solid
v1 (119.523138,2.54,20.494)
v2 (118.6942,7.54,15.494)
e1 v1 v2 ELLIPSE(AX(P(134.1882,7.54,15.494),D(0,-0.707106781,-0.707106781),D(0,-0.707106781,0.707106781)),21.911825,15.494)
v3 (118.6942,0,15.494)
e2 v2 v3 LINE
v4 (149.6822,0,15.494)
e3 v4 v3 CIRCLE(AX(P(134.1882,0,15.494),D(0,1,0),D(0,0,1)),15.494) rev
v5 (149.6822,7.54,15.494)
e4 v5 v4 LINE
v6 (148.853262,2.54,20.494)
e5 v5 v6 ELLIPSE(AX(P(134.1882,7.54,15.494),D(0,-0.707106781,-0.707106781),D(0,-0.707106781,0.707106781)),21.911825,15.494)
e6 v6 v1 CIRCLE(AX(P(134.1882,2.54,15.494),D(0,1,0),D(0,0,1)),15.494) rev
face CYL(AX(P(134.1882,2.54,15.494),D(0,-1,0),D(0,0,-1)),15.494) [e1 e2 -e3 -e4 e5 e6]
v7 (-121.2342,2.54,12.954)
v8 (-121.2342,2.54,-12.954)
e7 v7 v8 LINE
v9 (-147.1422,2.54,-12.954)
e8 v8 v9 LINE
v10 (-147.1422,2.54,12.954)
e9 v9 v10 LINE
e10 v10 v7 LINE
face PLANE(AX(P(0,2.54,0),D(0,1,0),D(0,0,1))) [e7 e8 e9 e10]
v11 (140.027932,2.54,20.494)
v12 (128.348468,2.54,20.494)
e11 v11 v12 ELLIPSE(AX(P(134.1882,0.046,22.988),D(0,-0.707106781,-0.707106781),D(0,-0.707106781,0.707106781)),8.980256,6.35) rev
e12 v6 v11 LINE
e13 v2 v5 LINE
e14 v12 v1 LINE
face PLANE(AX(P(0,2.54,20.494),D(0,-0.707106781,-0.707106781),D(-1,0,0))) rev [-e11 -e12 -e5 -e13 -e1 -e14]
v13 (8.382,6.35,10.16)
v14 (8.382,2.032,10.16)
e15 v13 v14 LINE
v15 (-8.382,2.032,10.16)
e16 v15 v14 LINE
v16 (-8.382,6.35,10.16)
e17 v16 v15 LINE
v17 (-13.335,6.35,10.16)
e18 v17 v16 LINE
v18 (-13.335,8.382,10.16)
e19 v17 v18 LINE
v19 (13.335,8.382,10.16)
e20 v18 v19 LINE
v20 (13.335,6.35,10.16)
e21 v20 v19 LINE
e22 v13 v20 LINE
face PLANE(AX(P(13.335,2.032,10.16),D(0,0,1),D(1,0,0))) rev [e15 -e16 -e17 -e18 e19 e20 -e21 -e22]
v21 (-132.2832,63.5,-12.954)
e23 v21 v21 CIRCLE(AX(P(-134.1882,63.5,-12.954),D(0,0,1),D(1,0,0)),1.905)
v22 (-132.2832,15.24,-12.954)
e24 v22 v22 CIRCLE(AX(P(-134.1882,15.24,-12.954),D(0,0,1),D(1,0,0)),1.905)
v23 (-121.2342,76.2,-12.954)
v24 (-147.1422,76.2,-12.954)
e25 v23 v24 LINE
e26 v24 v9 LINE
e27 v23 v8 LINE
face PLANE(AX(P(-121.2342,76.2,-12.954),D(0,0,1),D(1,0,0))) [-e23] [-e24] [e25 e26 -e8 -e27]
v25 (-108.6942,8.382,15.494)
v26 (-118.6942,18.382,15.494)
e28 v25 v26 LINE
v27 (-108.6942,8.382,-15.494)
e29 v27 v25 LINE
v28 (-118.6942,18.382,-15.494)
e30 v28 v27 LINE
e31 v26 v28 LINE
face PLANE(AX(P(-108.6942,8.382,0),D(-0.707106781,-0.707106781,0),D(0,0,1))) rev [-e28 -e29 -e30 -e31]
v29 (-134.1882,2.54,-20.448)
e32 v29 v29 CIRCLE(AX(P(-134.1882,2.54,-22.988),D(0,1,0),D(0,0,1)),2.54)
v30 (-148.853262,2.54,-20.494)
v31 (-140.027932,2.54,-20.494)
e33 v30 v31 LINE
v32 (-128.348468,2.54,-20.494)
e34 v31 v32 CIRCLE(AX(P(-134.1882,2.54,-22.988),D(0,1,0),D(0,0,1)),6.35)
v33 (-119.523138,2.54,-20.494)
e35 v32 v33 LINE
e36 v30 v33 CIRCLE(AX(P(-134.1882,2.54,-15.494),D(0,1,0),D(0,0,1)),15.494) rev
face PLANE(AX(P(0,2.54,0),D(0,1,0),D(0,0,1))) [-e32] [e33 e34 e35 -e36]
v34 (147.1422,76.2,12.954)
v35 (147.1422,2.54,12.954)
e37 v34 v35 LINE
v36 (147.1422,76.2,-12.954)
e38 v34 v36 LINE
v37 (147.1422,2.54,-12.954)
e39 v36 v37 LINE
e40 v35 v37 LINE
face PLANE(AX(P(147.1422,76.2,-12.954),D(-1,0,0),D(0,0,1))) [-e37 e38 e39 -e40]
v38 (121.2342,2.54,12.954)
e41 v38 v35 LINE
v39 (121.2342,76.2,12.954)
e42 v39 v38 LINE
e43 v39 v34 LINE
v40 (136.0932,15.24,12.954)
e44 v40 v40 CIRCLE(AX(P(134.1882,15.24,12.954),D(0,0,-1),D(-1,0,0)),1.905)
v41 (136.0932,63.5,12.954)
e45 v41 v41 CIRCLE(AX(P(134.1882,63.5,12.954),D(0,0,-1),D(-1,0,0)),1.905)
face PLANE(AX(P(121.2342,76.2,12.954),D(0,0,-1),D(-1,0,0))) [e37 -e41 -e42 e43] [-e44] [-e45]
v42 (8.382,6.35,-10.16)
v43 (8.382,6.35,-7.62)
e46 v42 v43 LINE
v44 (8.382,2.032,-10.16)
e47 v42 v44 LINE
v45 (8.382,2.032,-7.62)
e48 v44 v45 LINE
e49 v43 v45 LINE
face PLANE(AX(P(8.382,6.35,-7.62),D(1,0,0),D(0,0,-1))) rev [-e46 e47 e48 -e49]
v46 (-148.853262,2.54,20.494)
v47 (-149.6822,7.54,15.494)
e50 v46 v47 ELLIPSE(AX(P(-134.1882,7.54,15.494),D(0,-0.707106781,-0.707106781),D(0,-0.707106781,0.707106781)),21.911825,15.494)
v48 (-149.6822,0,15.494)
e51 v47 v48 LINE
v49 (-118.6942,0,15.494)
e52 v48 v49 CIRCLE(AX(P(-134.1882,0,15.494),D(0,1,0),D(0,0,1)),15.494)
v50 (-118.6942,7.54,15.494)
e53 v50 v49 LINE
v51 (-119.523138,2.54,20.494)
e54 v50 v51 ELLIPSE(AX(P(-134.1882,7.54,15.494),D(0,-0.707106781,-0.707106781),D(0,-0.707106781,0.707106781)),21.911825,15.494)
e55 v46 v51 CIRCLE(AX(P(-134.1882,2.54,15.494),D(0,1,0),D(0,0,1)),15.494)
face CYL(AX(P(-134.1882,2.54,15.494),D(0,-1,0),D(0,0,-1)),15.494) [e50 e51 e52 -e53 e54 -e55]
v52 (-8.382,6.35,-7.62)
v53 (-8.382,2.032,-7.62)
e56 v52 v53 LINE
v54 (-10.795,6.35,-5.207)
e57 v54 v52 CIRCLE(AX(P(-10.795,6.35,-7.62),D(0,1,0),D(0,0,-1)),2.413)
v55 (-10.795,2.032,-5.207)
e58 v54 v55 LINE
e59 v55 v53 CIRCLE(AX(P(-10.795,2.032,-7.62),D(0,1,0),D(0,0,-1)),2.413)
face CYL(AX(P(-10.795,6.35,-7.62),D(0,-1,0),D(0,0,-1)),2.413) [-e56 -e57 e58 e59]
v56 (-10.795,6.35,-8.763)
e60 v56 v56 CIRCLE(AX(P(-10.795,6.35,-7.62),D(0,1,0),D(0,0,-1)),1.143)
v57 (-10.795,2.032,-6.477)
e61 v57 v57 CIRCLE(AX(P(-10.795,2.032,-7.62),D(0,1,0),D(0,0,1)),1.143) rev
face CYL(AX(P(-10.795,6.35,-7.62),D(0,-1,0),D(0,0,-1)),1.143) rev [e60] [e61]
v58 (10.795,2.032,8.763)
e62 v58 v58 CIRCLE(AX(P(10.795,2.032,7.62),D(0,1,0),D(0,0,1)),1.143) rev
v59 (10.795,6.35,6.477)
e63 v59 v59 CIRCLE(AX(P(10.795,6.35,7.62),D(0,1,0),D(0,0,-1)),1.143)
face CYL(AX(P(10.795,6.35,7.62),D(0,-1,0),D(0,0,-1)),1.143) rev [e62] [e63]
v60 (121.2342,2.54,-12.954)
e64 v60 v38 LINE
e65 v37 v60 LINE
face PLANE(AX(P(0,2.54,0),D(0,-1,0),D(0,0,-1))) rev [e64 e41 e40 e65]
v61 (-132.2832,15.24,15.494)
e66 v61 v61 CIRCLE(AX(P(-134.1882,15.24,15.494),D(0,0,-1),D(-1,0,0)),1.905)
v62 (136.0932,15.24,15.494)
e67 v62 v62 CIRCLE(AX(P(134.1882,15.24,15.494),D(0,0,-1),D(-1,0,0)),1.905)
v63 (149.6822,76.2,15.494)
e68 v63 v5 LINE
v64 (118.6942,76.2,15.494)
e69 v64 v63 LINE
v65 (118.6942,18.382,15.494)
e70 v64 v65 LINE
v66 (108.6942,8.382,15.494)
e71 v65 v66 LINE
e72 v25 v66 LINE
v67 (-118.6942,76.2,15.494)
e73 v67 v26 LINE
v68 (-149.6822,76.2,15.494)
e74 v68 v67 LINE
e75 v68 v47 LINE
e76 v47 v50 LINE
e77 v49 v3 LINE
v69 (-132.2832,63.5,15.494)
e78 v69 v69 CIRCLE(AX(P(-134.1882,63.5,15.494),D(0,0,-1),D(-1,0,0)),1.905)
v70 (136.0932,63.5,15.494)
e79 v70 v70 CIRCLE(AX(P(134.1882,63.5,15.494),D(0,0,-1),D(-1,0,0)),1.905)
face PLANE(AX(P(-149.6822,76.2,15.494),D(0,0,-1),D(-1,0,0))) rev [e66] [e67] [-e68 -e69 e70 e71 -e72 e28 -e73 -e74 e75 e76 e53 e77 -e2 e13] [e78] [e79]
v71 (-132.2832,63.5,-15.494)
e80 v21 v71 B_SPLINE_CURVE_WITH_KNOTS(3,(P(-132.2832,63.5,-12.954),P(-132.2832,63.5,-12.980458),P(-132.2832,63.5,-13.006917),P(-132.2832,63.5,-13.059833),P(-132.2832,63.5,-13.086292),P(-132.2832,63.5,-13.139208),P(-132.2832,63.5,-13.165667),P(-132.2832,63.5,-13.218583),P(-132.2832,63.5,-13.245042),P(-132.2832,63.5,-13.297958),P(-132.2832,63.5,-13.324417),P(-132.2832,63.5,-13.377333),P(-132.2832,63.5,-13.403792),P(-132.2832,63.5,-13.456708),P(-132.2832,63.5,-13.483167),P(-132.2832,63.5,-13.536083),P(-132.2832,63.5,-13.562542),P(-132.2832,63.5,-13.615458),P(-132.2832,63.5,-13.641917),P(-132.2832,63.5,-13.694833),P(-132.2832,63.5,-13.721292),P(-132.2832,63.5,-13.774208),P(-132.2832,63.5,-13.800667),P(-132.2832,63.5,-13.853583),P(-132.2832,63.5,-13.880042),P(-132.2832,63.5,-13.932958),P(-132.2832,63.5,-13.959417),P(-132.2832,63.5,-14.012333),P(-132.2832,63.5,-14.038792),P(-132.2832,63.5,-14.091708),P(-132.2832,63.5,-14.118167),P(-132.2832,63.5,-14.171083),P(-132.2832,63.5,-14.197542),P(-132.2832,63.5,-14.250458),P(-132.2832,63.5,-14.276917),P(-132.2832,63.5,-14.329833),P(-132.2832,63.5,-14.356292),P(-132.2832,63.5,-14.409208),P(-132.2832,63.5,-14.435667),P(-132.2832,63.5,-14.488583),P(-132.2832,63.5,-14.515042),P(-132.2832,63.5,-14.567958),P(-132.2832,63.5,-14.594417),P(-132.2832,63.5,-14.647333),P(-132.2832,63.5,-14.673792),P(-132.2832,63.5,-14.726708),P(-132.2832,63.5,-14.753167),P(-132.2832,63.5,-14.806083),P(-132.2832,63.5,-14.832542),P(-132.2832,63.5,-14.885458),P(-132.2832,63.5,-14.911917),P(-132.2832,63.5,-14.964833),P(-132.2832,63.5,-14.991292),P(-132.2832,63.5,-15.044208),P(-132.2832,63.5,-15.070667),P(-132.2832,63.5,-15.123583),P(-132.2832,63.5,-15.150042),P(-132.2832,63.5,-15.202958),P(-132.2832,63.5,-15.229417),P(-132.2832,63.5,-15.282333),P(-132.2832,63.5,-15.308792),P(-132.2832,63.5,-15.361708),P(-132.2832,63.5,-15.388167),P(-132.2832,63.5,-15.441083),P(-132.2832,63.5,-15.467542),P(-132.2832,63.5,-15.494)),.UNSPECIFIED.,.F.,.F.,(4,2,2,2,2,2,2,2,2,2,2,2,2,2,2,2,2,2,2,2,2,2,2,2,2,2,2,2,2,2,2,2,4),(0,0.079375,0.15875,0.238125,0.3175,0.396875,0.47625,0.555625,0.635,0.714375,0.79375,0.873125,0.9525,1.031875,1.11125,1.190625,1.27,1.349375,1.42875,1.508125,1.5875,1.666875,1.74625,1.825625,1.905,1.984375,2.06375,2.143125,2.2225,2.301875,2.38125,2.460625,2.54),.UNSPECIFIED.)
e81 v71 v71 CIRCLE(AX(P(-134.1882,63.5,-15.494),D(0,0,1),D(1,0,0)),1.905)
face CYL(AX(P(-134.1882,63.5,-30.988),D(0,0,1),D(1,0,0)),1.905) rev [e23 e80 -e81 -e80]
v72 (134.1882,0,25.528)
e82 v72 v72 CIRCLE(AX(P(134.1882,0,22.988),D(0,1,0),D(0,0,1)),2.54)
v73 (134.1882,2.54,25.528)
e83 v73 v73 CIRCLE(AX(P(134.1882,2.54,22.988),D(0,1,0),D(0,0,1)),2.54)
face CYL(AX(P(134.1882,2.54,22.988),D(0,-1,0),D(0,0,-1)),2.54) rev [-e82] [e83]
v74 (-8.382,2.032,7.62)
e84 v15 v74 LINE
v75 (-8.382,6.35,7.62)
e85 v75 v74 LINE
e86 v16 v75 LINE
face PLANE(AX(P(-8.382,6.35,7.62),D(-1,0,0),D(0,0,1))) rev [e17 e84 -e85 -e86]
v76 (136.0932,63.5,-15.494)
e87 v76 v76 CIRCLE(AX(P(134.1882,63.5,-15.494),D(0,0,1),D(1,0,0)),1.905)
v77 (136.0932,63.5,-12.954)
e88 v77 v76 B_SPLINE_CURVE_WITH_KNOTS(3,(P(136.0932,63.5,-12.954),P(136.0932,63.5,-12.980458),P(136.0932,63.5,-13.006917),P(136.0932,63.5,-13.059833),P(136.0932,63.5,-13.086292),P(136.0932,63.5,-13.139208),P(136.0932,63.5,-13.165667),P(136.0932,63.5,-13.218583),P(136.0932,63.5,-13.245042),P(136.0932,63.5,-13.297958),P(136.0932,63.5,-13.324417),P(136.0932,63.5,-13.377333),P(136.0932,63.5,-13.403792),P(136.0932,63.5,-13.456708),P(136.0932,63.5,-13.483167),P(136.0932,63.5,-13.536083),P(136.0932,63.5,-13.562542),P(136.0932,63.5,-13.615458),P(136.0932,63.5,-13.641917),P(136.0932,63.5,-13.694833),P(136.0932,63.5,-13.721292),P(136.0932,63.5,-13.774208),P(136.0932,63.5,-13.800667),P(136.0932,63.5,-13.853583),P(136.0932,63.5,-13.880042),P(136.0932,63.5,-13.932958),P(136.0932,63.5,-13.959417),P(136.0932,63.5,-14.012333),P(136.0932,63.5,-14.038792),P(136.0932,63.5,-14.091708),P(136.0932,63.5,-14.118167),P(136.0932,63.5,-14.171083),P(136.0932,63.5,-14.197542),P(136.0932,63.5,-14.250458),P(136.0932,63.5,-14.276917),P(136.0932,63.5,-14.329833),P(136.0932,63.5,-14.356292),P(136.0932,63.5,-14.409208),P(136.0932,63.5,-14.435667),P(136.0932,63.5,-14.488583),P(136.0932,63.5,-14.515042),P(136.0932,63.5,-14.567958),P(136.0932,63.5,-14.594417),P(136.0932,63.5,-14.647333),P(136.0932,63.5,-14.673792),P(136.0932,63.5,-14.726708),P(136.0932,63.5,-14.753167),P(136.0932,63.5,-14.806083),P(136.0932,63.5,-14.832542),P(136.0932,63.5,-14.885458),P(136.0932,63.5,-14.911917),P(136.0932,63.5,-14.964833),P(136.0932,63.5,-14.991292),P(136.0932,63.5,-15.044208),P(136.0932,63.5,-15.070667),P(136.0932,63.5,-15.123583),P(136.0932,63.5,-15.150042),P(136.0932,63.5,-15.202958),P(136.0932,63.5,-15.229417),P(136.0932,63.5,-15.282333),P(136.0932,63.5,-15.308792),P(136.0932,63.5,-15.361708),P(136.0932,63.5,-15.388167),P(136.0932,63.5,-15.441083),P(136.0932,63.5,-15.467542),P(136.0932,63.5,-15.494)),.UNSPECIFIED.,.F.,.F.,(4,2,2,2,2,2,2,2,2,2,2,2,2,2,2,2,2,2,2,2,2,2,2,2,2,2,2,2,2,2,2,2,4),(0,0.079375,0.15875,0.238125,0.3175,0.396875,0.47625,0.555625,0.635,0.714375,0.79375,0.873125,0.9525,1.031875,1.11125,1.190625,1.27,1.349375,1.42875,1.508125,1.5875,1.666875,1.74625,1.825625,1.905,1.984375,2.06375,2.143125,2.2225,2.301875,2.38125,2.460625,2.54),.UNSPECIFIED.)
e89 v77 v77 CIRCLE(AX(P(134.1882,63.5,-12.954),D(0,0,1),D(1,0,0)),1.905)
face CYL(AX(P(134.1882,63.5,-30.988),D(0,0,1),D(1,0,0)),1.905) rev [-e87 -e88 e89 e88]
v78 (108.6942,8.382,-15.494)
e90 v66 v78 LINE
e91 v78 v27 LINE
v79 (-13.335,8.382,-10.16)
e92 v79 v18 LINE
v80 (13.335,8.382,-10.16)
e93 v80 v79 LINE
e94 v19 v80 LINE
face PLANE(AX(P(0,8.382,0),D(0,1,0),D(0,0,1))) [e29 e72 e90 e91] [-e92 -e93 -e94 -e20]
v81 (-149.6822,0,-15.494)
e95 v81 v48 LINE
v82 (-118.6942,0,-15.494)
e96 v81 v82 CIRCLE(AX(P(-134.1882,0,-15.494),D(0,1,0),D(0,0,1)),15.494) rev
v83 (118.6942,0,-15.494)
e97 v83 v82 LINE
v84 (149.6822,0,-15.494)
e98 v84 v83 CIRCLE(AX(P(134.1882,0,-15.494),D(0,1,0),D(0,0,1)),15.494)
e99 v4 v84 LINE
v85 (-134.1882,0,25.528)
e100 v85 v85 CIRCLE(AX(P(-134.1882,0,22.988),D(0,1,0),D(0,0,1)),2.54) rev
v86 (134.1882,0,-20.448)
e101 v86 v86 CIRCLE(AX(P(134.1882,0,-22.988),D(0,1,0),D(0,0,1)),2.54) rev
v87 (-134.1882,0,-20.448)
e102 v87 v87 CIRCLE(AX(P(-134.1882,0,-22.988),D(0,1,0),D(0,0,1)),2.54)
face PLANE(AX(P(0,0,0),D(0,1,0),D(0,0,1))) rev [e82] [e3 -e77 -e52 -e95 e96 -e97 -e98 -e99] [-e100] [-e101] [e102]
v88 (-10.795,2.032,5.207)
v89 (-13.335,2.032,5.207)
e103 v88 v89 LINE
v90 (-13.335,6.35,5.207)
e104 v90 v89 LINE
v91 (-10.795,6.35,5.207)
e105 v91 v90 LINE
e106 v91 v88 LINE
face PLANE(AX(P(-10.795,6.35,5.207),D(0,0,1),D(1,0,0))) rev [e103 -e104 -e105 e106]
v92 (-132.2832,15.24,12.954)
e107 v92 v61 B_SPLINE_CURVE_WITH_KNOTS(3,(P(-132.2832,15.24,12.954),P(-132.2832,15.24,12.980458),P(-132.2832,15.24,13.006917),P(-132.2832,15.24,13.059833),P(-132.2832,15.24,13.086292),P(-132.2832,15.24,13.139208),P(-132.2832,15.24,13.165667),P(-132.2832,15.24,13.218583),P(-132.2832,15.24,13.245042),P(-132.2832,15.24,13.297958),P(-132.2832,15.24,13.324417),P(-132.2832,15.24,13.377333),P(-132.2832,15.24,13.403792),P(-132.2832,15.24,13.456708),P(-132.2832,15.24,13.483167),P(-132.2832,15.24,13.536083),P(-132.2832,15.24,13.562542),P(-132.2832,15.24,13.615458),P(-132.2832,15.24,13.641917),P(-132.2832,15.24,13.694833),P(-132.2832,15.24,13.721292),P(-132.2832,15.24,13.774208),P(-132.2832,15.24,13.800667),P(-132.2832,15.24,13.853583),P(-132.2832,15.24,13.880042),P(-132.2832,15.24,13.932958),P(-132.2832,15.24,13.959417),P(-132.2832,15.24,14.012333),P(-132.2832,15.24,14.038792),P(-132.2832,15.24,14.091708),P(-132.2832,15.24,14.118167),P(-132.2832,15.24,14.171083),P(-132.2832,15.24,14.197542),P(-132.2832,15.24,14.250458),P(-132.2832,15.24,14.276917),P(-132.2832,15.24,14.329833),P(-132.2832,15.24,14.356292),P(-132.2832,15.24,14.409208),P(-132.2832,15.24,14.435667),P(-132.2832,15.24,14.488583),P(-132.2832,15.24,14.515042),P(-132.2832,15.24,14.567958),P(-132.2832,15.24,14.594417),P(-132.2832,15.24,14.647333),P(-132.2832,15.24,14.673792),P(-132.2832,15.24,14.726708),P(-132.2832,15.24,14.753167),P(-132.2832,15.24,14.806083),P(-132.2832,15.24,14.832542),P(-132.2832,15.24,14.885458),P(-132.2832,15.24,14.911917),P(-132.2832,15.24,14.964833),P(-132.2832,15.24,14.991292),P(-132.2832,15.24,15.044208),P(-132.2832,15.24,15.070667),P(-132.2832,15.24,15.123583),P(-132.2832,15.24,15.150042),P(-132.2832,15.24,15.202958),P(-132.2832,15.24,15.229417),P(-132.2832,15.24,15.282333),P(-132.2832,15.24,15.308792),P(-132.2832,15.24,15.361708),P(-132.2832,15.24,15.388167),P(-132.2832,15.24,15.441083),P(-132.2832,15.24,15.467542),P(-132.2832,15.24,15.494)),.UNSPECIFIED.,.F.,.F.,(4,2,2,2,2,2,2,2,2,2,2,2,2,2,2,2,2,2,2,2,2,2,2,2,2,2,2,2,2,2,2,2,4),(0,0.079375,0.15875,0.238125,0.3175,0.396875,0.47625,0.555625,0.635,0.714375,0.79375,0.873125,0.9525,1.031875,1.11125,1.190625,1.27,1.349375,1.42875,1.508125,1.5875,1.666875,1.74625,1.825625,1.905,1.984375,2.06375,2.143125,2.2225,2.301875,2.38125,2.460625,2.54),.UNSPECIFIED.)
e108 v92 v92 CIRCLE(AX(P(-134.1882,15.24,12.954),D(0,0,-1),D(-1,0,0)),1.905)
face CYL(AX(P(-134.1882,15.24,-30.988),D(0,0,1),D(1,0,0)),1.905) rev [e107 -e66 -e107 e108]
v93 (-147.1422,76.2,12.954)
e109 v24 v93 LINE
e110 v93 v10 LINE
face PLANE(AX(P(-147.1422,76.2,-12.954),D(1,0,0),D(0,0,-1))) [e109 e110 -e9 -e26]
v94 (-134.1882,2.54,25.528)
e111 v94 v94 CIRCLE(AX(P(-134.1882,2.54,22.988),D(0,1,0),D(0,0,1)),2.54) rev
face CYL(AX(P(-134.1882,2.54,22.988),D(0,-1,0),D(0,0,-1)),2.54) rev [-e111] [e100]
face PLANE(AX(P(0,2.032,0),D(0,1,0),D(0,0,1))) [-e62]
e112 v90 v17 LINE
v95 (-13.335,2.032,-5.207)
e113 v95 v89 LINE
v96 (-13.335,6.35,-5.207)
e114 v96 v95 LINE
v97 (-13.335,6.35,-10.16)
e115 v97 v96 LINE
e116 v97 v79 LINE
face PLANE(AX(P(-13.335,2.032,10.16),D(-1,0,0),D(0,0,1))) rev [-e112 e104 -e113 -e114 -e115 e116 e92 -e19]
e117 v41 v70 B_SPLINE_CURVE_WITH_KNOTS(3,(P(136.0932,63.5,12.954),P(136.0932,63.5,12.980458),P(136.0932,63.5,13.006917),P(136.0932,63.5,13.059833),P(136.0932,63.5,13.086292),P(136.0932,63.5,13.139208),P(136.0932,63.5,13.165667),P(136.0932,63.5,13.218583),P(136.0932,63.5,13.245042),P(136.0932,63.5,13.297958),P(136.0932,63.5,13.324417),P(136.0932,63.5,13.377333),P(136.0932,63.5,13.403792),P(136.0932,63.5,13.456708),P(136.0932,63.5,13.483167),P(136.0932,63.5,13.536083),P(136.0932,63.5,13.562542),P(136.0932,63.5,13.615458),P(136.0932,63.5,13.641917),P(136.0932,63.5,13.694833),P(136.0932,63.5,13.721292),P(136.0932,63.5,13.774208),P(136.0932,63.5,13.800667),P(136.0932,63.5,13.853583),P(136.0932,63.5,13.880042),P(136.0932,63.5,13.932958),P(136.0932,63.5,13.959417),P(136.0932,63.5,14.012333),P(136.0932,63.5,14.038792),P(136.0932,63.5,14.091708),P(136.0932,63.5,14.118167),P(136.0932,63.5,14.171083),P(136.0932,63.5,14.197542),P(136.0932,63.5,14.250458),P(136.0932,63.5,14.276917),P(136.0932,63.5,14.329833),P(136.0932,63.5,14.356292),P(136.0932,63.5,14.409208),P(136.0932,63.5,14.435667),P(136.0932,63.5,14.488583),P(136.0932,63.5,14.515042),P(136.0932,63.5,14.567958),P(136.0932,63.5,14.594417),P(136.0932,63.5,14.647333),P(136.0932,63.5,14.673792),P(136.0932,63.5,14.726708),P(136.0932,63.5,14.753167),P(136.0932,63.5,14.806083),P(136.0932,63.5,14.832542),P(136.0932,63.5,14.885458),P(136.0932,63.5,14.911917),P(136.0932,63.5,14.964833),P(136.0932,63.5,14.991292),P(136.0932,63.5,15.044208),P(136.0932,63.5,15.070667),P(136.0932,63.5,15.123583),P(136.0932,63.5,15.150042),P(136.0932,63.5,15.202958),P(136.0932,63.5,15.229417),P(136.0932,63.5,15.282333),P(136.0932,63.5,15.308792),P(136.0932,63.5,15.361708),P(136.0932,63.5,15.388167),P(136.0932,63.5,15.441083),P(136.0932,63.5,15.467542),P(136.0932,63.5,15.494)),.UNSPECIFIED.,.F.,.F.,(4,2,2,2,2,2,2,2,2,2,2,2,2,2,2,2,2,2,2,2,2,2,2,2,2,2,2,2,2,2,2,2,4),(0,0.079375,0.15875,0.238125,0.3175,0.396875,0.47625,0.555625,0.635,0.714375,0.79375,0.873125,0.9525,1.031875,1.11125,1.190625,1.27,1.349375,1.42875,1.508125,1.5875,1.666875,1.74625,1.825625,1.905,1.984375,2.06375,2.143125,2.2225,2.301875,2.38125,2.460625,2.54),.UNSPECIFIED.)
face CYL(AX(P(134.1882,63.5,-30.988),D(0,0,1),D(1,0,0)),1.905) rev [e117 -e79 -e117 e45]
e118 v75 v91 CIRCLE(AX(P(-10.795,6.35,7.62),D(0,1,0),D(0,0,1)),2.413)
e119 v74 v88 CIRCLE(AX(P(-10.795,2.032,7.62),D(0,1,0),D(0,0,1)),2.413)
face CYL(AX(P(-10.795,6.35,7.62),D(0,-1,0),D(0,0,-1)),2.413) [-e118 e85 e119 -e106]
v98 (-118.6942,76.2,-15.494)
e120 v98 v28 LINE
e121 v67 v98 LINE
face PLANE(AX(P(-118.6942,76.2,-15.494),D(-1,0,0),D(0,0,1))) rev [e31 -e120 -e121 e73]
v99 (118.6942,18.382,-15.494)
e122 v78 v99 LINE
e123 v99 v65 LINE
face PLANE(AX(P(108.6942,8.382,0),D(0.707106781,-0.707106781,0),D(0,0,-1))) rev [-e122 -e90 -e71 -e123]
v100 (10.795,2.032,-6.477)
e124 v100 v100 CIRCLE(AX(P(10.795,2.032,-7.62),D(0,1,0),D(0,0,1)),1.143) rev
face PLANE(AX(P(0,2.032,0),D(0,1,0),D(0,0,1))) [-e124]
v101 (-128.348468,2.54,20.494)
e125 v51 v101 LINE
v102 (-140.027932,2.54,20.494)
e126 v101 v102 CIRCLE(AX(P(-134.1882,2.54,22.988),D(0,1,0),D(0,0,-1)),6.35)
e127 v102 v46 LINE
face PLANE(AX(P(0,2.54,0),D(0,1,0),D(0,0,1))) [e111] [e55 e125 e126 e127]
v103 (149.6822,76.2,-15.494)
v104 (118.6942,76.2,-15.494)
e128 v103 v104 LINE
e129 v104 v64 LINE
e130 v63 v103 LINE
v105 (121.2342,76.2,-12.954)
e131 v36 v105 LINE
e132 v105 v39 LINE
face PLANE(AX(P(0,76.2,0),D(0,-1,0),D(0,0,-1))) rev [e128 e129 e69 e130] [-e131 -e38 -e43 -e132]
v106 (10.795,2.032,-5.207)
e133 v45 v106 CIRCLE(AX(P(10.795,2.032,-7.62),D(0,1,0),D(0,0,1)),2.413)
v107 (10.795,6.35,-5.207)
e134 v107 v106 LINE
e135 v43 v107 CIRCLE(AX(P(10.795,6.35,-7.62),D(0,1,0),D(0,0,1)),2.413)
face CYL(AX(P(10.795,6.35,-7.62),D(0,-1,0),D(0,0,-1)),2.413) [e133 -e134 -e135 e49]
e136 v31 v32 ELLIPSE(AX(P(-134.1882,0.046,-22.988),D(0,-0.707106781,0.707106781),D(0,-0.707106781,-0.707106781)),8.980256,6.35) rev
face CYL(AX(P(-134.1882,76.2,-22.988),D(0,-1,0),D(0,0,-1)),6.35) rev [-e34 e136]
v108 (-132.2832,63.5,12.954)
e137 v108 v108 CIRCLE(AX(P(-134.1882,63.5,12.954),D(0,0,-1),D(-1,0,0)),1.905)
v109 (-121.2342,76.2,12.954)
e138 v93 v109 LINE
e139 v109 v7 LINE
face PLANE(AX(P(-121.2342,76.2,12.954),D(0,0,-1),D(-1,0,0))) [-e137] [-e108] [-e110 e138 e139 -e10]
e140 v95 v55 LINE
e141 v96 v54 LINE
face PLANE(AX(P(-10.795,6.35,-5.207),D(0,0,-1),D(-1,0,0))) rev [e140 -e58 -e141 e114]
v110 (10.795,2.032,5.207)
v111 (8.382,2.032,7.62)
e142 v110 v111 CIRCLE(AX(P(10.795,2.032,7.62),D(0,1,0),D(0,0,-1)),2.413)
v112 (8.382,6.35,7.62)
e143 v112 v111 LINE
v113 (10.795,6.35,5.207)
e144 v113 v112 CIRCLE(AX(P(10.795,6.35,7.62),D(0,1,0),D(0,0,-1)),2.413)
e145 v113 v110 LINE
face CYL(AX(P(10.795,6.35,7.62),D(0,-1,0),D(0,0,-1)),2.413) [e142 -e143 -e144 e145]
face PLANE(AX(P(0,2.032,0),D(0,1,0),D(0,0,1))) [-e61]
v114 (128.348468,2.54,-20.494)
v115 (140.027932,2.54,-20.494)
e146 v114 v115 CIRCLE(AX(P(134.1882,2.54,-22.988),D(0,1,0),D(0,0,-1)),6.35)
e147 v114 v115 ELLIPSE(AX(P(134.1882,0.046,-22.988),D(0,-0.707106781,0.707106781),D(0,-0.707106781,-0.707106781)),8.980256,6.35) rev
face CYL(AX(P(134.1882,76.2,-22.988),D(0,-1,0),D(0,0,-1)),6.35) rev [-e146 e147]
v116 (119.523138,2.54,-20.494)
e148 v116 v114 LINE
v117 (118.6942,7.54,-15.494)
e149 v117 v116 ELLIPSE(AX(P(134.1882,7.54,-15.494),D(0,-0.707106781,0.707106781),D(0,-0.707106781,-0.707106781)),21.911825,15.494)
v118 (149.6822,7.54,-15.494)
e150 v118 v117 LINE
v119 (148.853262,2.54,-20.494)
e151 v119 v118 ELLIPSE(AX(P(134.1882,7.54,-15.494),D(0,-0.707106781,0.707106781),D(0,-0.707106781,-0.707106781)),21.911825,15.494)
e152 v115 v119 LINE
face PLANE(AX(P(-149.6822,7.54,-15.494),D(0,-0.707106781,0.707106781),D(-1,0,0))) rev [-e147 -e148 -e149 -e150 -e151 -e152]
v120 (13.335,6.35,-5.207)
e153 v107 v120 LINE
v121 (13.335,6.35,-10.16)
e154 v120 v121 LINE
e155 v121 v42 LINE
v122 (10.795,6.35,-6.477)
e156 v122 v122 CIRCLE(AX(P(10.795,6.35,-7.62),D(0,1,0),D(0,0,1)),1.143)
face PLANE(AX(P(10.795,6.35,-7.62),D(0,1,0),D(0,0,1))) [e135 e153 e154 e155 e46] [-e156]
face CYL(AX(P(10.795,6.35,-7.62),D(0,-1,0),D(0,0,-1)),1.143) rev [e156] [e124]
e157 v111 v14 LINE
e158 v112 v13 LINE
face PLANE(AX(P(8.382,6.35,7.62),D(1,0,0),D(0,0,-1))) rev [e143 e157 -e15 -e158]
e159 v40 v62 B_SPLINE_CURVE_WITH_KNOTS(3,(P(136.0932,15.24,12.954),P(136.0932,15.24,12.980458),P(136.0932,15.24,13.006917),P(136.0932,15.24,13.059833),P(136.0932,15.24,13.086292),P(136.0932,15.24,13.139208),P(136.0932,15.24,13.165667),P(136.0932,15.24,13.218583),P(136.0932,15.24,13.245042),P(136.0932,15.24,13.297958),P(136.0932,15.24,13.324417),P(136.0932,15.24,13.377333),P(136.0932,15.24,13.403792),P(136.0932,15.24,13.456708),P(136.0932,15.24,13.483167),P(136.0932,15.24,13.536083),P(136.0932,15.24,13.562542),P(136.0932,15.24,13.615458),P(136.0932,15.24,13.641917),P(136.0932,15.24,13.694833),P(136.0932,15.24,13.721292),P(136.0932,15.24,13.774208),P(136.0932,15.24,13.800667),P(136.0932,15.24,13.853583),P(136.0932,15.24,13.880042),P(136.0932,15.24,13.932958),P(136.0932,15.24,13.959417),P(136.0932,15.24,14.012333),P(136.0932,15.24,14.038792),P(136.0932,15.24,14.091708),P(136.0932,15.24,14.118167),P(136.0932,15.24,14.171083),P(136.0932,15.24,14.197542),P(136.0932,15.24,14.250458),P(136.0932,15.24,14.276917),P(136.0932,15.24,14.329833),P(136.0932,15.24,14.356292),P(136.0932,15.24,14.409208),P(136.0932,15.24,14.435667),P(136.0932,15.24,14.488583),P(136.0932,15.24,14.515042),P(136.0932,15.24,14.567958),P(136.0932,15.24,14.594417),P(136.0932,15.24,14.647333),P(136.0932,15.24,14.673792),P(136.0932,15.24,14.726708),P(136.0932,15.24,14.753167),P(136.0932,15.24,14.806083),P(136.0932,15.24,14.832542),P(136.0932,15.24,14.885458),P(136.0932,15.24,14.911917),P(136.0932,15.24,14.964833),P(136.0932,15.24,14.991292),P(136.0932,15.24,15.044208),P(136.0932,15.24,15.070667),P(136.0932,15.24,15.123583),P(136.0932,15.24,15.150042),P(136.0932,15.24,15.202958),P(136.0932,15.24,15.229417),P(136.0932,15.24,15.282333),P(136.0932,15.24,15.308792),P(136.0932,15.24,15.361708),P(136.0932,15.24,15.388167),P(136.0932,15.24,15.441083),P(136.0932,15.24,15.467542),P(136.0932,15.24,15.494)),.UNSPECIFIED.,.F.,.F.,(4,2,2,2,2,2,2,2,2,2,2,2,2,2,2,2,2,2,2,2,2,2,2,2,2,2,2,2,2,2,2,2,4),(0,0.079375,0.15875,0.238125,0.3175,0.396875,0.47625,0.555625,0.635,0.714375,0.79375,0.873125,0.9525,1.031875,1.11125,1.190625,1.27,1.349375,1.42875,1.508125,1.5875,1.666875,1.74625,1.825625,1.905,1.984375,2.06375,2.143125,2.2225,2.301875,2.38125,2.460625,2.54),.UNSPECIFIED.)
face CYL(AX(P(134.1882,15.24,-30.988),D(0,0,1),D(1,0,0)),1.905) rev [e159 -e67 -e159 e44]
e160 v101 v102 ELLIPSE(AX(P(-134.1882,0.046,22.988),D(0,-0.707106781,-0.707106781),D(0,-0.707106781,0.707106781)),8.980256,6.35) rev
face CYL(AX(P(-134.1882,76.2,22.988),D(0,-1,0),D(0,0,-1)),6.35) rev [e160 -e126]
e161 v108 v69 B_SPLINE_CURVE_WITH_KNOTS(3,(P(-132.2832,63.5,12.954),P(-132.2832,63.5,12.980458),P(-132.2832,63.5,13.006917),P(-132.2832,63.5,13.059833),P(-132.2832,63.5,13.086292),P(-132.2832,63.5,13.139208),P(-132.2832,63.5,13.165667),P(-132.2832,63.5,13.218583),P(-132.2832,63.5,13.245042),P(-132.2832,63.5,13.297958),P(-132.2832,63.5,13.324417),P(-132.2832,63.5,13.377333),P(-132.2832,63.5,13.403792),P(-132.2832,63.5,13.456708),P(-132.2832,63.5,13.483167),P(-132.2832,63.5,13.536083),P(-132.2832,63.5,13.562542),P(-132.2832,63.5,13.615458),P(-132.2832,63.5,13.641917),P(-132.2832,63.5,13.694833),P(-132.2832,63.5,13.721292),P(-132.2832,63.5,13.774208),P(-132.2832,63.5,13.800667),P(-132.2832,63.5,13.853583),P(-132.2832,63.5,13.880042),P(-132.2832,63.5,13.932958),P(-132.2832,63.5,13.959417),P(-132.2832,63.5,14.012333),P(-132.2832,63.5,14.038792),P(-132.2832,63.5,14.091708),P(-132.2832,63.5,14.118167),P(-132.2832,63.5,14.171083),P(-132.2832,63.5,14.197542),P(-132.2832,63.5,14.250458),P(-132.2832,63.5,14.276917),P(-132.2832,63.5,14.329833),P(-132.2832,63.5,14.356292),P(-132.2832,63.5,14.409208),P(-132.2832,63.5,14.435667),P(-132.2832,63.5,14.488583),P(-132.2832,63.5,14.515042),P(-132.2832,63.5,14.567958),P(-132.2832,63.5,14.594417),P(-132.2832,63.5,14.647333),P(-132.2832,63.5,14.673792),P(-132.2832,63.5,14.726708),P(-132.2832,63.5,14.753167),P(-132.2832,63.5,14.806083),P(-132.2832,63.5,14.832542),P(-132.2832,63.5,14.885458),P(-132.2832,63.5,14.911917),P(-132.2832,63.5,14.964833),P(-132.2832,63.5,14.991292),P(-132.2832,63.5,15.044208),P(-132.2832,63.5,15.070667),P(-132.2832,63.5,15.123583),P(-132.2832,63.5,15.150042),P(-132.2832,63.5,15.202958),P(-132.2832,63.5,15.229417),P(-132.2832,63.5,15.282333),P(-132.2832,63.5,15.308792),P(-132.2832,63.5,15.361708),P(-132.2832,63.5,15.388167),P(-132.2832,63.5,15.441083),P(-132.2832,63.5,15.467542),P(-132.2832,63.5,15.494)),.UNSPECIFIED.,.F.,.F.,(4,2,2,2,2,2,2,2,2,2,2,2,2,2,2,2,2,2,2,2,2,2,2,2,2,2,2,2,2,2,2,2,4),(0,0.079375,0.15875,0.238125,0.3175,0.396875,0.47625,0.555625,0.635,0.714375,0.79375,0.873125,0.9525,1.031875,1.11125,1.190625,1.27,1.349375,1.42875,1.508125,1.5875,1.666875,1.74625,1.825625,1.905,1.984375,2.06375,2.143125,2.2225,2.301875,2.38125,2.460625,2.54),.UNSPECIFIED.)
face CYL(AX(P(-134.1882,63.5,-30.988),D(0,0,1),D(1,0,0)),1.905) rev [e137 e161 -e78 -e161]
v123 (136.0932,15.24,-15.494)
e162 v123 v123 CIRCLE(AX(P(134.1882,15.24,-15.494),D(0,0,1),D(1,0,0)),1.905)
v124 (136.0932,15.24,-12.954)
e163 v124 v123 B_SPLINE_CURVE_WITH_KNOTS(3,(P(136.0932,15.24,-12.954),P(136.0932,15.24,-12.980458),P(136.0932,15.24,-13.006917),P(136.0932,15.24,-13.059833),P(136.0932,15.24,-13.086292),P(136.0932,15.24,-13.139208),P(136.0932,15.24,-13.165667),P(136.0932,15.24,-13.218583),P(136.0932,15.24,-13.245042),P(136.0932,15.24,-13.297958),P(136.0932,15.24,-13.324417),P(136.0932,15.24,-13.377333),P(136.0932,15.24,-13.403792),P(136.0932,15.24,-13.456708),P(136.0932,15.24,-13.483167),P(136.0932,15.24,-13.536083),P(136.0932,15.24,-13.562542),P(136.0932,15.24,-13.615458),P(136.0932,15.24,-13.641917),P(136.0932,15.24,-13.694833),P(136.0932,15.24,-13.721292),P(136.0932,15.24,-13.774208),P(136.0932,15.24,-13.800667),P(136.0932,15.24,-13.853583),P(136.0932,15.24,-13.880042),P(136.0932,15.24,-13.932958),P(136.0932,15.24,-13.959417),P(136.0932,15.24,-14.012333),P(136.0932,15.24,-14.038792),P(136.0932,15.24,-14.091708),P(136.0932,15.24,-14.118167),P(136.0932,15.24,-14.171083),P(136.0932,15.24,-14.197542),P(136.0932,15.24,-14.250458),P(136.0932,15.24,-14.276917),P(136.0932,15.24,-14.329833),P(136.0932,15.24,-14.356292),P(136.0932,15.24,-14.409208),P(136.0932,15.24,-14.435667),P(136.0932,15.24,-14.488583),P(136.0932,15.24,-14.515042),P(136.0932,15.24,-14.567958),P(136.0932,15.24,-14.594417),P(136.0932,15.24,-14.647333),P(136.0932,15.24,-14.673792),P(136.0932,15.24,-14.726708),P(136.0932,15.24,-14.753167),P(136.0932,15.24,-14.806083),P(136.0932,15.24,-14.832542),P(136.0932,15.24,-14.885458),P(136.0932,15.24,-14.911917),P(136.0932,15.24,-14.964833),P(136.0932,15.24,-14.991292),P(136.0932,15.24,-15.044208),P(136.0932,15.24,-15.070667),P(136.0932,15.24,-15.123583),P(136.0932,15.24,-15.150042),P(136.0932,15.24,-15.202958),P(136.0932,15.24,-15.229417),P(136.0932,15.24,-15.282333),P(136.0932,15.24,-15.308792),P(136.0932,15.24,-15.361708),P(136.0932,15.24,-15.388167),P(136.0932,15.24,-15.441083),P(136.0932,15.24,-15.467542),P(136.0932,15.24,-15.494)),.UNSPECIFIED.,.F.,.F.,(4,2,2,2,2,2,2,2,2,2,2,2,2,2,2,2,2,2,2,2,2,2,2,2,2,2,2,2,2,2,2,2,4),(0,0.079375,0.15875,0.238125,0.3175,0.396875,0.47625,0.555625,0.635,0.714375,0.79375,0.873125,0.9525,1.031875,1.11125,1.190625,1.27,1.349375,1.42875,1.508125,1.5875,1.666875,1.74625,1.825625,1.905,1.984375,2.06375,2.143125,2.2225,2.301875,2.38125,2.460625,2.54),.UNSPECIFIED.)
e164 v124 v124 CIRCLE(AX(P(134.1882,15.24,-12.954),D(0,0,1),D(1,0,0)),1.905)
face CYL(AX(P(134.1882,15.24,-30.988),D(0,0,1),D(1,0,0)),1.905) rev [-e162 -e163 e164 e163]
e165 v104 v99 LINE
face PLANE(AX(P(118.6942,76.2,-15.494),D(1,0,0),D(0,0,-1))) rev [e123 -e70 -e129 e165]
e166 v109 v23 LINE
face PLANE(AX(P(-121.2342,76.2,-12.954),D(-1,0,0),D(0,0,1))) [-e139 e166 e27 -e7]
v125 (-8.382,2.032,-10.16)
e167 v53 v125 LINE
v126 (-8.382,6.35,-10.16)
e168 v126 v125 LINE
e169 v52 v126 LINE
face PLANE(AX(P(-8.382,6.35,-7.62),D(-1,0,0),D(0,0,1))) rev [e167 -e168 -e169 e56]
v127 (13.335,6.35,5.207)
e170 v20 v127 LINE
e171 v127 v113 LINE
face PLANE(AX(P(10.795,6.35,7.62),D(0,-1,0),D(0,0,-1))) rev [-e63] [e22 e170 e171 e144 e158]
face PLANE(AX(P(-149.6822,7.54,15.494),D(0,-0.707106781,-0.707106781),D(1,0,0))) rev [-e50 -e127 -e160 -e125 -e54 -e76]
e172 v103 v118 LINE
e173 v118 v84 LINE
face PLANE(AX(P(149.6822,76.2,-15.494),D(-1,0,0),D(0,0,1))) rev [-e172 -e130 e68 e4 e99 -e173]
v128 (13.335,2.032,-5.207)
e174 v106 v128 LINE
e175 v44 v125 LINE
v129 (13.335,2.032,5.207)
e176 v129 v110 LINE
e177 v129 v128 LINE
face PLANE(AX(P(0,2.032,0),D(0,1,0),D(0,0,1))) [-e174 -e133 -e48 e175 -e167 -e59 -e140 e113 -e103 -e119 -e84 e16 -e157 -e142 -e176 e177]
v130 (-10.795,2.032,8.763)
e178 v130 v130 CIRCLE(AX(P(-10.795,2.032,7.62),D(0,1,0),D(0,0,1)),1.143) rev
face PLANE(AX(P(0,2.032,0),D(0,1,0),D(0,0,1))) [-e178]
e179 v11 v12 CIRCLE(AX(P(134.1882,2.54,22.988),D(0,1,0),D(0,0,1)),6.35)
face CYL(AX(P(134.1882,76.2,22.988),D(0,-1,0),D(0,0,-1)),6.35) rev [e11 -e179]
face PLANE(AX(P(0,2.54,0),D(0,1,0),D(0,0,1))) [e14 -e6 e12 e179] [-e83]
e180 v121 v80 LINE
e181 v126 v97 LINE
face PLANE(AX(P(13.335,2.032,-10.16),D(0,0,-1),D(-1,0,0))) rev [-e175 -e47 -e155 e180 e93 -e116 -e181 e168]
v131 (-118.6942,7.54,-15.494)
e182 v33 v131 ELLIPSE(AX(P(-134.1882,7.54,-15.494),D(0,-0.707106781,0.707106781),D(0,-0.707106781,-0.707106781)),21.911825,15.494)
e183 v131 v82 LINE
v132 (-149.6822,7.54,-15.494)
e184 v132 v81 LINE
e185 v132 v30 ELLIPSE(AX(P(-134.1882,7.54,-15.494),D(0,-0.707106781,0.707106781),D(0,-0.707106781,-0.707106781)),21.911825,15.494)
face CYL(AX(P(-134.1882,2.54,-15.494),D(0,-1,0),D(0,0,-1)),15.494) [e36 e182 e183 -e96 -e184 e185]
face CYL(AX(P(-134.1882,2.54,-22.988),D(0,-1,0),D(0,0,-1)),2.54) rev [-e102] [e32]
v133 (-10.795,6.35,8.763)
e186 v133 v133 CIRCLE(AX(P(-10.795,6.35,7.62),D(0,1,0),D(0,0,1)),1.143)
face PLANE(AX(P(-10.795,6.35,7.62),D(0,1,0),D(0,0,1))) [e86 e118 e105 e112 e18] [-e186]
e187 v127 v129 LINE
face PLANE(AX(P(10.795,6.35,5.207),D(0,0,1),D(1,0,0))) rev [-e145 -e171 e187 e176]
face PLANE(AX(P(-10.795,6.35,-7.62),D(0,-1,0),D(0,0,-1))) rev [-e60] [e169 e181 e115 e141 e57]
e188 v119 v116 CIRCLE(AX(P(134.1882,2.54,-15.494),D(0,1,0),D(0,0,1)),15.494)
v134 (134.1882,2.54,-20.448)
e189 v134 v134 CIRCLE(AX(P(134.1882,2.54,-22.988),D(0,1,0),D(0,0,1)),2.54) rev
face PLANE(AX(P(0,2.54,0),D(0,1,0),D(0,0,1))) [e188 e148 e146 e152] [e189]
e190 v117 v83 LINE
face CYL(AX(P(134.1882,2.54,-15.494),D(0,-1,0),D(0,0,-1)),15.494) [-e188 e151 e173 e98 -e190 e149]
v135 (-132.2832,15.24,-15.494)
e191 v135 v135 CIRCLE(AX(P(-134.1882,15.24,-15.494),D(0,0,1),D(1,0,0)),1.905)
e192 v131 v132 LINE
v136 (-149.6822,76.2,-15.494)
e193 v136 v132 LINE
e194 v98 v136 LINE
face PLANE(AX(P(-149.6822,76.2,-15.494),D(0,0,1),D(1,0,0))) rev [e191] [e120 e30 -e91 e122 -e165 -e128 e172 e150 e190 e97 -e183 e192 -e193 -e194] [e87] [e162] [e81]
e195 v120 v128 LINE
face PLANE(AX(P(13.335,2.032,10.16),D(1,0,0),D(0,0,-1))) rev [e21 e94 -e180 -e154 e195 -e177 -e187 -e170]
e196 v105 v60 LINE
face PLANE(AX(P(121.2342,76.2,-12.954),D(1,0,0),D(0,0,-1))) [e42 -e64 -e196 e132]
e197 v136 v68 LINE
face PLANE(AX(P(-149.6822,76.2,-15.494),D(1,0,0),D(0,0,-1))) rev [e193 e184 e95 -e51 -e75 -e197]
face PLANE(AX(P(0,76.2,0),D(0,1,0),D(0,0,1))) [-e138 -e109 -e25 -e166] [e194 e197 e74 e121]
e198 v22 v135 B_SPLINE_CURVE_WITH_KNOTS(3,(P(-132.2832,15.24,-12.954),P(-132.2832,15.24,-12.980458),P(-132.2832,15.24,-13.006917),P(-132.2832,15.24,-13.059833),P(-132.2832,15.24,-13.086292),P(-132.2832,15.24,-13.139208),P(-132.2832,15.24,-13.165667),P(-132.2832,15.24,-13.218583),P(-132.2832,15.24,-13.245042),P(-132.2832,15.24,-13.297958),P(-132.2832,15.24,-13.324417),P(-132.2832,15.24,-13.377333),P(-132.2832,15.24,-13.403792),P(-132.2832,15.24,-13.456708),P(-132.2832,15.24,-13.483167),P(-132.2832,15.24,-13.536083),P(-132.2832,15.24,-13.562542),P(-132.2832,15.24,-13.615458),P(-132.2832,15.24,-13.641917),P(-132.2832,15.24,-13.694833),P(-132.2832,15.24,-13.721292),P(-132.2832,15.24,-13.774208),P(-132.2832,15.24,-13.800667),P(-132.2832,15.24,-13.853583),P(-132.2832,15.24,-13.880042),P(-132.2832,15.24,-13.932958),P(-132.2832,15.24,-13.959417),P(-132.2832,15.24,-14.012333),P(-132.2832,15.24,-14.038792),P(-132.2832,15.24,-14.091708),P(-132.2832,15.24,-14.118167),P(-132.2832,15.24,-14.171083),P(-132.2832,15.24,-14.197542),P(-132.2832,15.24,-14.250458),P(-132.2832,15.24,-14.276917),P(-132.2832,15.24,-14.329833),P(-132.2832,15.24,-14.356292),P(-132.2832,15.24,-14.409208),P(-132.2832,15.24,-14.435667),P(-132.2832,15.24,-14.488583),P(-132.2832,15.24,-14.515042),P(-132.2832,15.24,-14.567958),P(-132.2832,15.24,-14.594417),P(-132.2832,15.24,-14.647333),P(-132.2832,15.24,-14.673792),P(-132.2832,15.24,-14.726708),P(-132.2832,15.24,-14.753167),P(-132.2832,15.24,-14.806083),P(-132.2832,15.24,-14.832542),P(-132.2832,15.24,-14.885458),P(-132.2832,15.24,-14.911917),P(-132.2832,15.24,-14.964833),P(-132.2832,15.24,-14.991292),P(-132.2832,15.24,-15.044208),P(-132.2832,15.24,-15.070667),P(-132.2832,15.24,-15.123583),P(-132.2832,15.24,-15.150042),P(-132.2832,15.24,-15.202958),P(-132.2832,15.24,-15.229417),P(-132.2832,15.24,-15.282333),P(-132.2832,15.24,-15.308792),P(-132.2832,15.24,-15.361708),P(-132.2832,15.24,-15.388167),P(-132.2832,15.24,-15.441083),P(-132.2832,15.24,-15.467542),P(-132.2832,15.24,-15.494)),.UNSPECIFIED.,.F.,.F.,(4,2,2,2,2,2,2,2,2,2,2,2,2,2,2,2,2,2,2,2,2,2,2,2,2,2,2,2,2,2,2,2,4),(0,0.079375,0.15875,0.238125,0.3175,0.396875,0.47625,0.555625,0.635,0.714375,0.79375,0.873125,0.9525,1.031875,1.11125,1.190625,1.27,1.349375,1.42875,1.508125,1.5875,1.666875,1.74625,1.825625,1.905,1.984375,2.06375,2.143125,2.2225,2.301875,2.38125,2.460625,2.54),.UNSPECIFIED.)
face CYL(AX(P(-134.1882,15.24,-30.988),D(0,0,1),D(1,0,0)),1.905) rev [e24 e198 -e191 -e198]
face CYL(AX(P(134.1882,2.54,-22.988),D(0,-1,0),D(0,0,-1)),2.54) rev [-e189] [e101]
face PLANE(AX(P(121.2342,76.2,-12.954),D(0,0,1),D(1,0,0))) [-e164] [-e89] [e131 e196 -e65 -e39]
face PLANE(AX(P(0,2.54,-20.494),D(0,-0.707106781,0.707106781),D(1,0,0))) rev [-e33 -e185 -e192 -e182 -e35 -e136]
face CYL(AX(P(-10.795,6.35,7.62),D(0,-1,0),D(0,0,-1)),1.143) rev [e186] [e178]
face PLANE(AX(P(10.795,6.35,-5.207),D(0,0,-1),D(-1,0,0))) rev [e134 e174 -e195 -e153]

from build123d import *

# Parameters (mm, degrees)
SKETCH1_W               = 30.988
SKETCH1_H               = 30.988
SKETCH1_W_2             = 25.908
SKETCH1_H_2             = 25.908
BOSS_EXTRUDE1_DEPTH     = 76.2
BOSS_EXTRUDE1_2_DEPTH   = 76.2
SKETCH2_W               = 237.3884
SKETCH2_H               = 30.988
BOSS_EXTRUDE2_DEPTH     = 8.382
CHAMFER1_SIZE           = 10
SKETCH3_R               = 2.54
BOSS_EXTRUDE4_DEPTH     = 2.54
CHAMFER4_SIZE           = 5
SKETCH5_R               = 6.35
CUT_EXTRUDE2_DEPTH      = 170.678557104
SKETCH7_W               = 25.908
SKETCH7_H               = 25.908
BOSS_EXTRUDE5_DEPTH     = 2.54
CUT_EXTRUDE3_DEPTH      = 175.275004865
CUT_EXTRUDE3_DEPTH_BACK = 175.275004865
SKETCH8_R               = 1.905
SKETCH12_W              = 26.67
SKETCH12_H              = 20.32
CUT_EXTRUDE4_DEPTH      = 6.35
SKETCH14_R              = 1.143
BOSS_EXTRUDE7_DEPTH     = 4.318


with BuildPart() as part:
    # Sketch1 → Boss-Extrude1 (new body)
    with BuildSketch(Plane(origin=(0, 0, 0), x_dir=(1, 0, 0), z_dir=(0, 1, 0))):
        with Locations((134.1882, 0)):
            Rectangle(SKETCH1_W, SKETCH1_H)
        with Locations((134.1882, 0)):
            Rectangle(SKETCH1_W_2, SKETCH1_H_2, mode=Mode.SUBTRACT)
    extrude(amount=BOSS_EXTRUDE1_DEPTH)



with BuildPart() as body_2:
    # Sketch1 → Boss-Extrude1 2 (new body)
    with BuildSketch(Plane(origin=(0, 0, 0), x_dir=(1, 0, 0), z_dir=(0, 1, 0))):
        with Locations((-134.1882, 0)):
            Rectangle(SKETCH1_W, SKETCH1_H)
        with Locations((-134.1882, 0)):
            Rectangle(SKETCH1_W_2, SKETCH1_H_2, mode=Mode.SUBTRACT)
    extrude(amount=BOSS_EXTRUDE1_2_DEPTH)


with BuildPart() as part_1:
    add(part.part)

    add(body_2.part)  # Boss-Extrude2 merges body 2
    # Sketch2 → Boss-Extrude2 (add)
    with BuildSketch(Plane(origin=(0, 0, 0), x_dir=(1, 0, 0), z_dir=(0, 1, 0))):
        Rectangle(SKETCH2_W, SKETCH2_H)
    extrude(amount=BOSS_EXTRUDE2_DEPTH)

    # Chamfer1
    chamfer1_edges = [part_1.edges().sort_by_distance(p)[0] for p in [
        (-118.6942, 8.382, 0),
        (118.6942, 8.382, 0),
    ]]
    chamfer(chamfer1_edges, length=CHAMFER1_SIZE)

    # Sketch3 → Boss-Extrude4 (add)
    # profile 1 of 4: a face of its own
    with BuildSketch(Plane(origin=(0, 0, 0), x_dir=(1, 0, 0), z_dir=(0, 1, 0))):
        with BuildLine():
            Line((-149.6822, -15.494), (-118.6942, -15.494))
            ThreePointArc((-118.6942, -15.494), (-134.1882, -30.988), (-149.6822, -15.494))
        make_face()
        with Locations(Location((-134.1882, -22.988, 0), (0, 0, 270))):
            Circle(SKETCH3_R, mode=Mode.SUBTRACT)
    # profile 2 of 4: a face of its own
    with BuildSketch(Plane(origin=(0, 0, 0), x_dir=(1, 0, 0), z_dir=(0, 1, 0))):
        with BuildLine():
            ThreePointArc((-149.6822, 15.494), (-134.1882, 30.988), (-118.6942, 15.494))
            Line((-118.6942, 15.494), (-149.6822, 15.494))
        make_face()
        with Locations(Location((-134.1882, 22.988, 0), (0, 0, 270))):
            Circle(SKETCH3_R, mode=Mode.SUBTRACT)
    # profile 3 of 4: a face of its own
    with BuildSketch(Plane(origin=(0, 0, 0), x_dir=(1, 0, 0), z_dir=(0, 1, 0))):
        with BuildLine():
            Line((149.6822, 15.494), (118.6942, 15.494))
            ThreePointArc((118.6942, 15.494), (134.1882, 30.988), (149.6822, 15.494))
        make_face()
        with Locations(Location((134.1882, 22.988, 0), (0, 0, 270))):
            Circle(SKETCH3_R, mode=Mode.SUBTRACT)
    # profile 4 of 4: a face of its own
    with BuildSketch(Plane(origin=(0, 0, 0), x_dir=(1, 0, 0), z_dir=(0, 1, 0))):
        with BuildLine():
            ThreePointArc((149.6822, -15.494), (134.1882, -30.988), (118.6942, -15.494))
            Line((118.6942, -15.494), (149.6822, -15.494))
        make_face()
        with Locations(Location((134.1882, -22.988, 0), (0, 0, 270))):
            Circle(SKETCH3_R, mode=Mode.SUBTRACT)
    extrude(amount=BOSS_EXTRUDE4_DEPTH)

    # Chamfer4
    # the kernel refuses this chamfer: 5 mm, written as the material it adds along each edge
    with BuildSketch(Plane(origin=(-162.54061494, 2.54, 15.494), x_dir=(0, 0.9996219169112968, -0.027495876610586317), z_dir=(1, 0, 0))) as chamfer4_piece_1_section:
        Polygon((CHAMFER4_SIZE * 0.999621916911, CHAMFER4_SIZE * 0.0274958766106), (-CHAMFER4_SIZE * 0.0274958766106, CHAMFER4_SIZE * 0.999621916911), (0, 0), align=None)
    chamfer4_piece_1 = extrude(amount=56.70482988, mode=Mode.PRIVATE)
    chamfer4_piece_1 = chamfer4_piece_1 & Plane(origin=(-134.1882, 4.212595499, 15.494), x_dir=(1, 0, 0), z_dir=(0, -1, 0)) * Cylinder(15.494, 134, mode=Mode.PRIVATE)
    chamfer4_piece_1 = chamfer4_piece_1 - Plane(origin=(-134.1882, 4.212595499, 22.988), x_dir=(0, 0, 1), z_dir=(0, -1, 0)) * Cylinder(2.54, 134, mode=Mode.PRIVATE)
    add(chamfer4_piece_1)
    with BuildSketch(Plane(origin=(-105.83578506, 2.54, -15.494), x_dir=(0, 0.9996219169112968, 0.027495876610586317), z_dir=(-1, 0, 0))) as chamfer4_piece_2_section:
        Polygon((CHAMFER4_SIZE * 0.999621916911, CHAMFER4_SIZE * 0.0274958766106), (-CHAMFER4_SIZE * 0.0274958766106, CHAMFER4_SIZE * 0.999621916911), (0, 0), align=None)
    chamfer4_piece_2 = extrude(amount=56.70482988, mode=Mode.PRIVATE)
    chamfer4_piece_2 = chamfer4_piece_2 & Plane(origin=(-134.1882, 4.212595498, -15.494), x_dir=(-1, 0, 0), z_dir=(0, -1, 0)) * Cylinder(15.494, 134, mode=Mode.PRIVATE)
    chamfer4_piece_2 = chamfer4_piece_2 - Plane(origin=(-134.1882, 4.212595498, -22.988), x_dir=(0, 0, 1), z_dir=(0, -1, 0)) * Cylinder(2.54, 134, mode=Mode.PRIVATE)
    add(chamfer4_piece_2)
    with BuildSketch(Plane(origin=(162.54061494, 2.54, -15.494), x_dir=(0, 0.9996219169112968, 0.027495876610586317), z_dir=(-1, 0, 0))) as chamfer4_piece_3_section:
        Polygon((CHAMFER4_SIZE * 0.999621916911, CHAMFER4_SIZE * 0.0274958766106), (-CHAMFER4_SIZE * 0.0274958766106, CHAMFER4_SIZE * 0.999621916911), (0, 0), align=None)
    chamfer4_piece_3 = extrude(amount=56.70482988, mode=Mode.PRIVATE)
    chamfer4_piece_3 = chamfer4_piece_3 & Plane(origin=(134.1882, 4.212595498, -15.494), x_dir=(-1, 0, 0), z_dir=(0, -1, 0)) * Cylinder(15.494, 134, mode=Mode.PRIVATE)
    chamfer4_piece_3 = chamfer4_piece_3 - Plane(origin=(134.1882, 4.212595498, -22.988), x_dir=(0, 0, 1), z_dir=(0, -1, 0)) * Cylinder(2.54, 134, mode=Mode.PRIVATE)
    add(chamfer4_piece_3)
    with BuildSketch(Plane(origin=(105.83578506, 2.54, 15.494), x_dir=(0, 0.9996219169112968, -0.027495876610586317), z_dir=(1, 0, 0))) as chamfer4_piece_4_section:
        Polygon((CHAMFER4_SIZE * 0.999621916911, CHAMFER4_SIZE * 0.0274958766106), (-CHAMFER4_SIZE * 0.0274958766106, CHAMFER4_SIZE * 0.999621916911), (0, 0), align=None)
    chamfer4_piece_4 = extrude(amount=56.70482988, mode=Mode.PRIVATE)
    chamfer4_piece_4 = chamfer4_piece_4 & Plane(origin=(134.1882, 4.212595499, 15.494), x_dir=(1, 0, 0), z_dir=(0, -1, 0)) * Cylinder(15.494, 134, mode=Mode.PRIVATE)
    chamfer4_piece_4 = chamfer4_piece_4 - Plane(origin=(134.1882, 4.212595499, 22.988), x_dir=(0, 0, 1), z_dir=(0, -1, 0)) * Cylinder(2.54, 134, mode=Mode.PRIVATE)
    add(chamfer4_piece_4)

    # Sketch5 → Cut-Extrude2 (cut, through all)
    with BuildSketch(Plane(origin=(0, 2.54, 0), x_dir=(1, 0, 0), z_dir=(0, 1, 0))):
        with Locations((-134.1882, 22.988)):
            Circle(SKETCH5_R)
        with Locations((134.1882, 22.988)):
            Circle(SKETCH5_R)
        with Locations((134.1882, -22.988)):
            Circle(SKETCH5_R)
        with Locations((-134.1882, -22.988)):
            Circle(SKETCH5_R)
    extrude(amount=CUT_EXTRUDE2_DEPTH, mode=Mode.SUBTRACT)

    # Sketch7 → Boss-Extrude5 (add)
    with BuildSketch(Plane(origin=(0, 0, 0), x_dir=(1, 0, 0), z_dir=(0, 1, 0))):
        with Locations((-134.1882, 0)):
            Rectangle(SKETCH7_W, SKETCH7_H)
        with Locations((134.1882, 0)):
            Rectangle(SKETCH7_W, SKETCH7_H)
    extrude(amount=BOSS_EXTRUDE5_DEPTH)

    # Sketch8 → Cut-Extrude3 (cut, two sides: drawn at the far end of the back side and taken through both)
    with BuildSketch(Plane.XY.offset(15.494).offset(-CUT_EXTRUDE3_DEPTH_BACK)):
        with Locations((-134.1882, 15.24)):
            Circle(SKETCH8_R)
        with Locations((134.1882, 15.24)):
            Circle(SKETCH8_R)
        with Locations((-134.1882, 63.5)):
            Circle(SKETCH8_R)
        with Locations((134.1882, 63.5)):
            Circle(SKETCH8_R)
    extrude(amount=CUT_EXTRUDE3_DEPTH + CUT_EXTRUDE3_DEPTH_BACK, mode=Mode.SUBTRACT)

    # Sketch12 → Cut-Extrude4 (cut)
    with BuildSketch(Plane(origin=(0, 8.382, 0), x_dir=(1, 0, 0), z_dir=(0, 1, 0))):
        Rectangle(SKETCH12_W, SKETCH12_H)
    extrude(amount=-CUT_EXTRUDE4_DEPTH, mode=Mode.SUBTRACT)

    # Sketch14 → Boss-Extrude7 (add)
    # profile 1 of 4: a face of its own
    with BuildSketch(Plane(origin=(0, 2.032, 0), x_dir=(1, 0, 0), z_dir=(0, 1, 0))):
        with BuildLine():
            Line((-8.382, -7.62), (-8.382, -10.16))
            Line((-8.382, -10.16), (-13.335, -10.16))
            Line((-13.335, -10.16), (-13.335, -5.207))
            Line((-13.335, -5.207), (-10.795, -5.207))
            ThreePointArc((-10.795, -5.207), (-9.088751337, -5.913751337), (-8.382, -7.62))
        make_face()
        with Locations(Location((-10.795, -7.62, 0), (0, 0, 270))):
            Circle(SKETCH14_R, mode=Mode.SUBTRACT)
    # profile 2 of 4: a face of its own
    with BuildSketch(Plane(origin=(0, 2.032, 0), x_dir=(1, 0, 0), z_dir=(0, 1, 0))):
        with BuildLine():
            Line((8.382, -7.62), (8.382, -10.16))
            Line((8.382, -10.16), (13.335, -10.16))
            Line((13.335, -10.16), (13.335, -5.207))
            Line((13.335, -5.207), (10.795, -5.207))
            ThreePointArc((10.795, -5.207), (9.088751337, -5.913751337), (8.382, -7.62))
        make_face()
        with Locations(Location((10.795, -7.62, 0), (0, 0, 90))):
            Circle(SKETCH14_R, mode=Mode.SUBTRACT)
    # profile 3 of 4: a face of its own
    with BuildSketch(Plane(origin=(0, 2.032, 0), x_dir=(1, 0, 0), z_dir=(0, 1, 0))):
        with BuildLine():
            Line((8.382, 7.62), (8.382, 10.16))
            Line((8.382, 10.16), (13.335, 10.16))
            Line((13.335, 10.16), (13.335, 5.207))
            Line((13.335, 5.207), (10.795, 5.207))
            ThreePointArc((10.795, 5.207), (9.088751337, 5.913751337), (8.382, 7.62))
        make_face()
        with Locations(Location((10.795, 7.62, 0), (0, 0, 270))):
            Circle(SKETCH14_R, mode=Mode.SUBTRACT)
    # profile 4 of 4: a face of its own
    with BuildSketch(Plane(origin=(0, 2.032, 0), x_dir=(1, 0, 0), z_dir=(0, 1, 0))):
        with BuildLine():
            Line((-8.382, 7.62), (-8.382, 10.16))
            Line((-8.382, 10.16), (-13.335, 10.16))
            Line((-13.335, 10.16), (-13.335, 5.207))
            Line((-13.335, 5.207), (-10.795, 5.207))
            ThreePointArc((-10.795, 5.207), (-9.088751337, 5.913751337), (-8.382, 7.62))
        make_face()
        with Locations(Location((-10.795, 7.62, 0), (0, 0, 90))):
            Circle(SKETCH14_R, mode=Mode.SUBTRACT)
    extrude(amount=BOSS_EXTRUDE7_DEPTH)


solid = part_1.part
